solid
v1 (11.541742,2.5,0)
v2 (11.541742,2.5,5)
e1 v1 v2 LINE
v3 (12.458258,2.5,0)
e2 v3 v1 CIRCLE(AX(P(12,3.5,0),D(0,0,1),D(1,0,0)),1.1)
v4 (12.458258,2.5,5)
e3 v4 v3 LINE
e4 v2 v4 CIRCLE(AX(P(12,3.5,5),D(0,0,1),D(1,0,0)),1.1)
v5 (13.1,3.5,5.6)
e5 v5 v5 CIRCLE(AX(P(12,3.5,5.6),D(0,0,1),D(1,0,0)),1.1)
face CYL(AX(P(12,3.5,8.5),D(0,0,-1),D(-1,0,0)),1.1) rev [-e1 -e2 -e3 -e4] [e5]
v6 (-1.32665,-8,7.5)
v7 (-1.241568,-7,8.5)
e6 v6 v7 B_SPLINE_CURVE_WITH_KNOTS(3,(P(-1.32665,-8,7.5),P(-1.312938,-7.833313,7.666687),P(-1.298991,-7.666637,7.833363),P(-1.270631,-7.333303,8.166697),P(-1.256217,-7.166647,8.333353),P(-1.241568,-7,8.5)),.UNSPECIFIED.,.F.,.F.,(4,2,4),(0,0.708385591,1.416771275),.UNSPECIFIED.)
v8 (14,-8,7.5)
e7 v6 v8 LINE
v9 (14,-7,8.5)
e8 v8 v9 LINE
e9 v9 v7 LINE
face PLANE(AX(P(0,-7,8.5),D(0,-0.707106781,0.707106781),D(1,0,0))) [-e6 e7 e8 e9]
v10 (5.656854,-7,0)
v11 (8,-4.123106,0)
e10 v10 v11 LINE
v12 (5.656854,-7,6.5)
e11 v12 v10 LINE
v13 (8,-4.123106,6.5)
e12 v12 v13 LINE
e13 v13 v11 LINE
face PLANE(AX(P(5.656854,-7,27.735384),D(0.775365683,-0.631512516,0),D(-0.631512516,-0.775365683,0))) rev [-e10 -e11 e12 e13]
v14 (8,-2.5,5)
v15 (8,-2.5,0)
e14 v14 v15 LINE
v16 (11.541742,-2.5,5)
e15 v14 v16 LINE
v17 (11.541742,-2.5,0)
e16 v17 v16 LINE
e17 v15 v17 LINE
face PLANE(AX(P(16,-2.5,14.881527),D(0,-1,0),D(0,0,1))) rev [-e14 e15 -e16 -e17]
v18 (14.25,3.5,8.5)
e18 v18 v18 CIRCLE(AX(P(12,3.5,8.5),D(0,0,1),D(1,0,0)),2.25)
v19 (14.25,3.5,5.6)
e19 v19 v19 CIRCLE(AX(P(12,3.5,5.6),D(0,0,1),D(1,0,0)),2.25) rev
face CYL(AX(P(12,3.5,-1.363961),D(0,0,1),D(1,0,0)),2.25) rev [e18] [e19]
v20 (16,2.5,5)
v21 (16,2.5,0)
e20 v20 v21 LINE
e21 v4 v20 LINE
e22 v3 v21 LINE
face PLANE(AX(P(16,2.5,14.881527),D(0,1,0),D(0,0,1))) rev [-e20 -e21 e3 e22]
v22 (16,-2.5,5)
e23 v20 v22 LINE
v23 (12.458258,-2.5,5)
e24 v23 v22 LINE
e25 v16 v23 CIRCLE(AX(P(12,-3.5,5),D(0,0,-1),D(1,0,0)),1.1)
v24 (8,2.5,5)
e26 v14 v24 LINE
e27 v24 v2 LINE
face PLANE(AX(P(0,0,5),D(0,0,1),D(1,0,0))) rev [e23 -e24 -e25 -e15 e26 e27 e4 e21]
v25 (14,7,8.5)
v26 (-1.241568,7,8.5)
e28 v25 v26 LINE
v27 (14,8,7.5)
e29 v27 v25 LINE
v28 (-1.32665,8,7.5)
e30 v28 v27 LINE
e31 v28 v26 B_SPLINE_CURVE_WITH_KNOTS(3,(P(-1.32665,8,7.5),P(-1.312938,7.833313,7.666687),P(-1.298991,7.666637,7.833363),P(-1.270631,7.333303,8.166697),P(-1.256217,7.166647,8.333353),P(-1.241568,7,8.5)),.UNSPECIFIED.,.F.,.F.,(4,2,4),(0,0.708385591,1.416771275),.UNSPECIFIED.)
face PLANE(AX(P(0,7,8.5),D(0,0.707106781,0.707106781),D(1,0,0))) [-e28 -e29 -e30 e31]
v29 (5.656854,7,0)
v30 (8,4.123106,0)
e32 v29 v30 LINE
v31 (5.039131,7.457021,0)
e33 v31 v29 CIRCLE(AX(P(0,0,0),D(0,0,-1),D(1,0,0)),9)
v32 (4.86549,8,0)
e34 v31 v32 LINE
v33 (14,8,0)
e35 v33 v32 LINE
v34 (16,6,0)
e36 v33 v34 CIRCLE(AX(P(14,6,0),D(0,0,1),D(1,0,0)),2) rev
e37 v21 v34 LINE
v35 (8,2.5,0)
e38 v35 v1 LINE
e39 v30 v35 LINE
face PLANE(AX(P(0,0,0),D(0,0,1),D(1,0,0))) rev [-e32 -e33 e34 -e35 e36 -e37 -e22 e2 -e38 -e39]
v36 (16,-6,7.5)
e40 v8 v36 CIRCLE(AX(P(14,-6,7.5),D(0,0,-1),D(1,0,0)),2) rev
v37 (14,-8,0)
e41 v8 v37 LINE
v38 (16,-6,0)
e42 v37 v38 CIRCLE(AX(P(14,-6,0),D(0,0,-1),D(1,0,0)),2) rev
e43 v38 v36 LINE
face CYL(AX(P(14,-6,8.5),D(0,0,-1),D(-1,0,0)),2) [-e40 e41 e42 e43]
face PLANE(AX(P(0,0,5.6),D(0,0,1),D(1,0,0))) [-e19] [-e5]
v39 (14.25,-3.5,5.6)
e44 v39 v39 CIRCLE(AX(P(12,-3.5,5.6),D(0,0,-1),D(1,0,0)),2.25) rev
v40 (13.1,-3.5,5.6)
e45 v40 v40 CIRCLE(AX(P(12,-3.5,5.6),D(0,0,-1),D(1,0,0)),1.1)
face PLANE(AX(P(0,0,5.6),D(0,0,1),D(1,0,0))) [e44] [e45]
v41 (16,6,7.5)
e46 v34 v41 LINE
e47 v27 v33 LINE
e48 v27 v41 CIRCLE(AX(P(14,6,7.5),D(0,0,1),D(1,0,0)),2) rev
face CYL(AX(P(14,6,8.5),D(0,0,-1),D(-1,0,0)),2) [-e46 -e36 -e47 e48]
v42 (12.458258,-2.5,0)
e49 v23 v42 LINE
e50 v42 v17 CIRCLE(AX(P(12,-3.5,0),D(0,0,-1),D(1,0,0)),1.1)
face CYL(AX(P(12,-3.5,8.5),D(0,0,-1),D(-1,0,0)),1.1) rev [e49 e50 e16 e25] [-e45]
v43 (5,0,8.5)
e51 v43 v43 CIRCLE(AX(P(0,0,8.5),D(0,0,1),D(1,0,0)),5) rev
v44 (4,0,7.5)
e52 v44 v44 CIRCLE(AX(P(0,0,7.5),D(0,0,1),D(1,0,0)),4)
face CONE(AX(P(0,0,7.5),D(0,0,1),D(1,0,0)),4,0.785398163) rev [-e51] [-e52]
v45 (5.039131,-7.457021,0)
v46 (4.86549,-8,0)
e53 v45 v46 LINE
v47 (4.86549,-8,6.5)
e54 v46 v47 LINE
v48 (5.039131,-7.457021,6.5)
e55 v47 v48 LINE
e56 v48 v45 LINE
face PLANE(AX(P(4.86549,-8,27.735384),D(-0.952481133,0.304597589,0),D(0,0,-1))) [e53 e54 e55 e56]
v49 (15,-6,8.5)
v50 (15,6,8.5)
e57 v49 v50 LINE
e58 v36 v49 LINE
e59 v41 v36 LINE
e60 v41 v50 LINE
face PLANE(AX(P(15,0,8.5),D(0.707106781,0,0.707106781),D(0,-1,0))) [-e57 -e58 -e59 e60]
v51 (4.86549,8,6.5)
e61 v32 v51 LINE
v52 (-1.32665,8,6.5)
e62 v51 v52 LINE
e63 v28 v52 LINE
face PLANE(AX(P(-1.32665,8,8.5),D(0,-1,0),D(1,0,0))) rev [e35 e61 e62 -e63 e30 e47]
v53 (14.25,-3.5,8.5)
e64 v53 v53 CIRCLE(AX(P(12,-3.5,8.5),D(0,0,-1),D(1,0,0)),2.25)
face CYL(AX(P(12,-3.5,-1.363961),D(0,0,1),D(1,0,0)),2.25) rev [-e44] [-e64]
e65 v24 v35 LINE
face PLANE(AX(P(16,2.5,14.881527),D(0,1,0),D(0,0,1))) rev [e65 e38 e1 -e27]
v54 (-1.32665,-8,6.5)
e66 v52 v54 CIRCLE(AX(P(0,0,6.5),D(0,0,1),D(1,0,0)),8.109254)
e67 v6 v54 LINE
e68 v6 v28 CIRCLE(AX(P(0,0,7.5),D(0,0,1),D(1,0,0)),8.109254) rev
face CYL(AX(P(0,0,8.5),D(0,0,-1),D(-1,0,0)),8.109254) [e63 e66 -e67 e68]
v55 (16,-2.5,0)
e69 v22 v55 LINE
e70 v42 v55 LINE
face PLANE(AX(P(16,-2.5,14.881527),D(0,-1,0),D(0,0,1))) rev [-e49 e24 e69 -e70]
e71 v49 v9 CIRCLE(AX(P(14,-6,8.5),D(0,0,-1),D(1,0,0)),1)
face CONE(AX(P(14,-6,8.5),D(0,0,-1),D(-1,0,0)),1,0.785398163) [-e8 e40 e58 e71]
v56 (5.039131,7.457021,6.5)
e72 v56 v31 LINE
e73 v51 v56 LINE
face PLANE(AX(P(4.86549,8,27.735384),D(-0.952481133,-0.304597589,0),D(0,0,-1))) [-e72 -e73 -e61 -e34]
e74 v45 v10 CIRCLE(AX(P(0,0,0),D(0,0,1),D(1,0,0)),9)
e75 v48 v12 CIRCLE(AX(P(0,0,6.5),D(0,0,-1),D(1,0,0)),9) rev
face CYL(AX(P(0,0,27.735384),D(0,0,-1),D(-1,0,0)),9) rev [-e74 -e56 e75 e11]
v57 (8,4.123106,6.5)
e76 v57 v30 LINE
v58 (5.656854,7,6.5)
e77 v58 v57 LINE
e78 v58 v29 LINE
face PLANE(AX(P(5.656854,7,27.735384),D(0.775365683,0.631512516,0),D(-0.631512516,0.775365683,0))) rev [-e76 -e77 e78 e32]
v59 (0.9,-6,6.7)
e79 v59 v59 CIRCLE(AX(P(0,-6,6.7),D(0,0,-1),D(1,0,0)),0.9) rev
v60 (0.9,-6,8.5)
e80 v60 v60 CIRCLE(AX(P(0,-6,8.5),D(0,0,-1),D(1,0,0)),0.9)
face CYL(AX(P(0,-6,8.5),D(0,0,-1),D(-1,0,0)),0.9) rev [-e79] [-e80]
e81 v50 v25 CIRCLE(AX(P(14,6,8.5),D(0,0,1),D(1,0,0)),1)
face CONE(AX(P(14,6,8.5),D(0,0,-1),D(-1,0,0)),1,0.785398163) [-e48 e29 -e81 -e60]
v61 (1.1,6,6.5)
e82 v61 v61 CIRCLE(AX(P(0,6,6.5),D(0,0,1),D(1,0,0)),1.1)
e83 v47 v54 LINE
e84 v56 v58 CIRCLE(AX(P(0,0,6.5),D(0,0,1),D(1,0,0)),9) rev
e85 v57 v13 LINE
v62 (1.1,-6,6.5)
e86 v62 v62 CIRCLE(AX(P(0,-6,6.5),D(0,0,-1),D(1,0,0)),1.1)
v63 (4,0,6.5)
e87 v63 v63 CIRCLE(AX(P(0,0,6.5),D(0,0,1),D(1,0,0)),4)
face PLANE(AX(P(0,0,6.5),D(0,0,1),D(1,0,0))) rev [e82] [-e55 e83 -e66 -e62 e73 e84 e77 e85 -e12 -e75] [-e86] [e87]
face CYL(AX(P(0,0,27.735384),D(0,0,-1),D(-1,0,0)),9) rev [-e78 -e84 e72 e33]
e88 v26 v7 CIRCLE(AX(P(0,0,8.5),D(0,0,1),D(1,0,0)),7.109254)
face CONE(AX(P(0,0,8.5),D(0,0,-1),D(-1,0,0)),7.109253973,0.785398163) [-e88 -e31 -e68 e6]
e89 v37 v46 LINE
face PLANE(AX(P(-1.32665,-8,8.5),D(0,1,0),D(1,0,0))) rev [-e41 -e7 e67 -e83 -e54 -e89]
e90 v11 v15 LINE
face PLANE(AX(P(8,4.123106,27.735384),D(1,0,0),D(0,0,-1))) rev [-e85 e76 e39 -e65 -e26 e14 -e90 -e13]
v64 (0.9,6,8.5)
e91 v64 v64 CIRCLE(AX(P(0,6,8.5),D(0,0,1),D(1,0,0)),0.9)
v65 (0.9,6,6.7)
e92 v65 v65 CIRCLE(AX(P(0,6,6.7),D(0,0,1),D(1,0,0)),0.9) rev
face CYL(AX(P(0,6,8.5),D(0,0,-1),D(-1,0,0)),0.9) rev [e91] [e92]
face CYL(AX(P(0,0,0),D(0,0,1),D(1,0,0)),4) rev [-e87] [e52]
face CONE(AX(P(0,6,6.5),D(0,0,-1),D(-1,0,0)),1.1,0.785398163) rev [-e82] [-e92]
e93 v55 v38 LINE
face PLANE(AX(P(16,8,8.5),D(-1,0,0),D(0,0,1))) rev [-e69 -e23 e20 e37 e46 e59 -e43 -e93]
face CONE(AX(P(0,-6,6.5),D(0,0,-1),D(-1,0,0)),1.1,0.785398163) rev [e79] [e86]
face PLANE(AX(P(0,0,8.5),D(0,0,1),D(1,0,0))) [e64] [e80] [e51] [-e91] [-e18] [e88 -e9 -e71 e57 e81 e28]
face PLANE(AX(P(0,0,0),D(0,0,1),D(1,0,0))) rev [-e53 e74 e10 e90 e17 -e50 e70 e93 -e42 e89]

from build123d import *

# Parameters (mm, degrees)
CROQUIS1_R              = 0.9
CROQUIS1_R_2            = 1.1
SALIENTE_EXTRUIR1_DEPTH = 8.5
REDONDEO1_R             = 2
CORTAR_EXTRUIR6_DEPTH   = 6.5
CHAFL_N1_SIZE           = 1
CHAFL_N1_SIZE_2         = 0.742384029
CROQUIS5_W              = 8
CROQUIS5_H              = 2.5
CORTAR_EXTRUIR7_DEPTH   = 5
CROQUIS6_R              = 2.25
CORTAR_EXTRUIR8_DEPTH   = 2.9
CHAFL_N3_SIZE           = 0.2
CROQUIS7_R              = 4
CORTAR_EXTRUIR9_DEPTH   = 20.80530232
CHAFL_N2_SIZE           = 1


with BuildPart() as part:
    # Croquis1 → Saliente-Extruir1 (new body)
    with BuildSketch(Plane.XY):
        with BuildLine():
            Line((-1.326649916, 8), (16, 8))
            Line((16, 8), (16, 0))
            Line((16, 0), (8, 0))
            Line((8, 0), (-8.109253973, 0))
            ThreePointArc((-8.109253973, 0), (-6.185391706, 5.24413286), (-1.326649916, 8))
        make_face()
        with Locations((0, 6)):
            Circle(CROQUIS1_R, mode=Mode.SUBTRACT)
        with Locations((12, 3.5)):
            Circle(CROQUIS1_R_2, mode=Mode.SUBTRACT)
    extrude(amount=SALIENTE_EXTRUIR1_DEPTH)

    # Redondeo1
    redondeo1_edges = [part.edges().sort_by_distance(p)[0] for p in [
        (16, 8, 4.25),
    ]]
    fillet(redondeo1_edges, radius=REDONDEO1_R)

    # Croquis4 → Cortar-Extruir6 (cut)
    with BuildSketch(Plane(origin=(0, 0, 0), x_dir=(-1, 0, 0), z_dir=(0, 0, -1))):
        with BuildLine():
            Line((-5.656854249, 7), (-8, 4.123105626))
            Line((-8, 4.123105626), (-8, 0))
            Line((-8, 0), (8.109253973, 0))
            Line((8.109253973, 0), (9, 0))
            ThreePointArc((9, 0), (3.878679656, 8.121320344), (-5.656854249, 7))
        make_face()
    extrude(amount=-CORTAR_EXTRUIR6_DEPTH, mode=Mode.SUBTRACT)

    # Chaflán1
    # the kernel refuses this chamfer: 1, 0.742384029 mm, written as the material it takes off along each edge
    with BuildSketch(Plane(origin=(16, 6, 8.5), x_dir=(-1, 0, 0), z_dir=(0, -1, 0))) as chafl_n1_piece_1:
        Polygon((CHAFL_N1_SIZE, 0), (0, CHAFL_N1_SIZE), (0, 0), align=None)
    extrude(amount=8.571682988, mode=Mode.SUBTRACT)
    with BuildSketch(Plane(origin=(-5.698510996, 8, 8.5), x_dir=(0, 0, -1), z_dir=(1, 0, 0))) as chafl_n1_piece_2:
        Polygon((CHAFL_N1_SIZE, 0), (0, -CHAFL_N1_SIZE), (0, 0), align=None)
    extrude(amount=19.698510996, mode=Mode.SUBTRACT)
    with BuildSketch(Plane(origin=(14, 6, 8.5), x_dir=(0, 1, 0), z_dir=(-1, 0, 0))) as chafl_n1_piece_3:
        Polygon((2, CHAFL_N1_SIZE), (2 - CHAFL_N1_SIZE, 0), (2, 0), align=None)
    revolve(axis=Axis((14, 6, 8.5), (0, 0, -1)), revolution_arc=90, mode=Mode.SUBTRACT)
    with BuildSketch(Plane(origin=(0, 0, 8.5), x_dir=(-0.9501026430594787, -0.3119374418876211, 0), z_dir=(0.3119374418876211, -0.9501026430594787, 0))) as chafl_n1_piece_4:
        Polygon((8.109253973 - CHAFL_N1_SIZE, 0), (8.109253973, CHAFL_N1_SIZE), (8.109253973, 0), align=None)
    revolve(axis=Axis((0, 0, 8.5), (0, 0, -1)), revolution_arc=116.936314038, mode=Mode.SUBTRACT)
    with BuildSketch(Plane(origin=(4.123105626, 8, 6.5), x_dir=(1, 0, 0), z_dir=(0, 0, -1))) as chafl_n1_piece_5:
        with BuildLine():
            Line((CHAFL_N1_SIZE_2, 0), (0.916025454, 0.542979283))
            ThreePointArc((0.916025454, 0.542979283), (0.478949419, 0.265590562), (0, 0))
            Line((0, 0), (CHAFL_N1_SIZE_2, 0))
        make_face()
    extrude(amount=9.23772815, mode=Mode.SUBTRACT)

    # Croquis5 → Cortar-Extruir7 (cut)
    with BuildSketch(Plane(origin=(0, 0, 0), x_dir=(-1, 0, 0), z_dir=(0, 0, -1))):
        with Locations((-12, 1.25)):
            Rectangle(CROQUIS5_W, CROQUIS5_H)
    extrude(amount=-CORTAR_EXTRUIR7_DEPTH, mode=Mode.SUBTRACT)

    # Croquis6 → Cortar-Extruir8 (cut)
    with BuildSketch(Plane.XY.offset(8.5)):
        with Locations((12, 3.5)):
            Circle(CROQUIS6_R)
    extrude(amount=-CORTAR_EXTRUIR8_DEPTH, mode=Mode.SUBTRACT)

    # Chaflán3
    chafl_n3_edges = [part.edges().sort_by_distance(p)[0] for p in [
        (-0.9, 6, 6.5),
    ]]
    chamfer(chafl_n3_edges, length=CHAFL_N3_SIZE)

    # Simetría1: part across plane


with BuildPart() as part_1:
    add(part.part)
    add(part.part.mirror(Plane(origin=(16, 0, 8.5), x_dir=(0, 0, 1), z_dir=(0, 1, 0))))

    # Croquis7 → Cortar-Extruir9 (cut, through all)
    with BuildSketch(Plane.XY.offset(8.5)):
        Circle(CROQUIS7_R)
    extrude(amount=-CORTAR_EXTRUIR9_DEPTH, mode=Mode.SUBTRACT)

    # Chaflán2
    chafl_n2_edges = [part_1.edges().sort_by_distance(p)[0] for p in [
        (-4, 0, 8.5),
    ]]
    chamfer(chafl_n2_edges, length=CHAFL_N2_SIZE)


solid = part_1.part
